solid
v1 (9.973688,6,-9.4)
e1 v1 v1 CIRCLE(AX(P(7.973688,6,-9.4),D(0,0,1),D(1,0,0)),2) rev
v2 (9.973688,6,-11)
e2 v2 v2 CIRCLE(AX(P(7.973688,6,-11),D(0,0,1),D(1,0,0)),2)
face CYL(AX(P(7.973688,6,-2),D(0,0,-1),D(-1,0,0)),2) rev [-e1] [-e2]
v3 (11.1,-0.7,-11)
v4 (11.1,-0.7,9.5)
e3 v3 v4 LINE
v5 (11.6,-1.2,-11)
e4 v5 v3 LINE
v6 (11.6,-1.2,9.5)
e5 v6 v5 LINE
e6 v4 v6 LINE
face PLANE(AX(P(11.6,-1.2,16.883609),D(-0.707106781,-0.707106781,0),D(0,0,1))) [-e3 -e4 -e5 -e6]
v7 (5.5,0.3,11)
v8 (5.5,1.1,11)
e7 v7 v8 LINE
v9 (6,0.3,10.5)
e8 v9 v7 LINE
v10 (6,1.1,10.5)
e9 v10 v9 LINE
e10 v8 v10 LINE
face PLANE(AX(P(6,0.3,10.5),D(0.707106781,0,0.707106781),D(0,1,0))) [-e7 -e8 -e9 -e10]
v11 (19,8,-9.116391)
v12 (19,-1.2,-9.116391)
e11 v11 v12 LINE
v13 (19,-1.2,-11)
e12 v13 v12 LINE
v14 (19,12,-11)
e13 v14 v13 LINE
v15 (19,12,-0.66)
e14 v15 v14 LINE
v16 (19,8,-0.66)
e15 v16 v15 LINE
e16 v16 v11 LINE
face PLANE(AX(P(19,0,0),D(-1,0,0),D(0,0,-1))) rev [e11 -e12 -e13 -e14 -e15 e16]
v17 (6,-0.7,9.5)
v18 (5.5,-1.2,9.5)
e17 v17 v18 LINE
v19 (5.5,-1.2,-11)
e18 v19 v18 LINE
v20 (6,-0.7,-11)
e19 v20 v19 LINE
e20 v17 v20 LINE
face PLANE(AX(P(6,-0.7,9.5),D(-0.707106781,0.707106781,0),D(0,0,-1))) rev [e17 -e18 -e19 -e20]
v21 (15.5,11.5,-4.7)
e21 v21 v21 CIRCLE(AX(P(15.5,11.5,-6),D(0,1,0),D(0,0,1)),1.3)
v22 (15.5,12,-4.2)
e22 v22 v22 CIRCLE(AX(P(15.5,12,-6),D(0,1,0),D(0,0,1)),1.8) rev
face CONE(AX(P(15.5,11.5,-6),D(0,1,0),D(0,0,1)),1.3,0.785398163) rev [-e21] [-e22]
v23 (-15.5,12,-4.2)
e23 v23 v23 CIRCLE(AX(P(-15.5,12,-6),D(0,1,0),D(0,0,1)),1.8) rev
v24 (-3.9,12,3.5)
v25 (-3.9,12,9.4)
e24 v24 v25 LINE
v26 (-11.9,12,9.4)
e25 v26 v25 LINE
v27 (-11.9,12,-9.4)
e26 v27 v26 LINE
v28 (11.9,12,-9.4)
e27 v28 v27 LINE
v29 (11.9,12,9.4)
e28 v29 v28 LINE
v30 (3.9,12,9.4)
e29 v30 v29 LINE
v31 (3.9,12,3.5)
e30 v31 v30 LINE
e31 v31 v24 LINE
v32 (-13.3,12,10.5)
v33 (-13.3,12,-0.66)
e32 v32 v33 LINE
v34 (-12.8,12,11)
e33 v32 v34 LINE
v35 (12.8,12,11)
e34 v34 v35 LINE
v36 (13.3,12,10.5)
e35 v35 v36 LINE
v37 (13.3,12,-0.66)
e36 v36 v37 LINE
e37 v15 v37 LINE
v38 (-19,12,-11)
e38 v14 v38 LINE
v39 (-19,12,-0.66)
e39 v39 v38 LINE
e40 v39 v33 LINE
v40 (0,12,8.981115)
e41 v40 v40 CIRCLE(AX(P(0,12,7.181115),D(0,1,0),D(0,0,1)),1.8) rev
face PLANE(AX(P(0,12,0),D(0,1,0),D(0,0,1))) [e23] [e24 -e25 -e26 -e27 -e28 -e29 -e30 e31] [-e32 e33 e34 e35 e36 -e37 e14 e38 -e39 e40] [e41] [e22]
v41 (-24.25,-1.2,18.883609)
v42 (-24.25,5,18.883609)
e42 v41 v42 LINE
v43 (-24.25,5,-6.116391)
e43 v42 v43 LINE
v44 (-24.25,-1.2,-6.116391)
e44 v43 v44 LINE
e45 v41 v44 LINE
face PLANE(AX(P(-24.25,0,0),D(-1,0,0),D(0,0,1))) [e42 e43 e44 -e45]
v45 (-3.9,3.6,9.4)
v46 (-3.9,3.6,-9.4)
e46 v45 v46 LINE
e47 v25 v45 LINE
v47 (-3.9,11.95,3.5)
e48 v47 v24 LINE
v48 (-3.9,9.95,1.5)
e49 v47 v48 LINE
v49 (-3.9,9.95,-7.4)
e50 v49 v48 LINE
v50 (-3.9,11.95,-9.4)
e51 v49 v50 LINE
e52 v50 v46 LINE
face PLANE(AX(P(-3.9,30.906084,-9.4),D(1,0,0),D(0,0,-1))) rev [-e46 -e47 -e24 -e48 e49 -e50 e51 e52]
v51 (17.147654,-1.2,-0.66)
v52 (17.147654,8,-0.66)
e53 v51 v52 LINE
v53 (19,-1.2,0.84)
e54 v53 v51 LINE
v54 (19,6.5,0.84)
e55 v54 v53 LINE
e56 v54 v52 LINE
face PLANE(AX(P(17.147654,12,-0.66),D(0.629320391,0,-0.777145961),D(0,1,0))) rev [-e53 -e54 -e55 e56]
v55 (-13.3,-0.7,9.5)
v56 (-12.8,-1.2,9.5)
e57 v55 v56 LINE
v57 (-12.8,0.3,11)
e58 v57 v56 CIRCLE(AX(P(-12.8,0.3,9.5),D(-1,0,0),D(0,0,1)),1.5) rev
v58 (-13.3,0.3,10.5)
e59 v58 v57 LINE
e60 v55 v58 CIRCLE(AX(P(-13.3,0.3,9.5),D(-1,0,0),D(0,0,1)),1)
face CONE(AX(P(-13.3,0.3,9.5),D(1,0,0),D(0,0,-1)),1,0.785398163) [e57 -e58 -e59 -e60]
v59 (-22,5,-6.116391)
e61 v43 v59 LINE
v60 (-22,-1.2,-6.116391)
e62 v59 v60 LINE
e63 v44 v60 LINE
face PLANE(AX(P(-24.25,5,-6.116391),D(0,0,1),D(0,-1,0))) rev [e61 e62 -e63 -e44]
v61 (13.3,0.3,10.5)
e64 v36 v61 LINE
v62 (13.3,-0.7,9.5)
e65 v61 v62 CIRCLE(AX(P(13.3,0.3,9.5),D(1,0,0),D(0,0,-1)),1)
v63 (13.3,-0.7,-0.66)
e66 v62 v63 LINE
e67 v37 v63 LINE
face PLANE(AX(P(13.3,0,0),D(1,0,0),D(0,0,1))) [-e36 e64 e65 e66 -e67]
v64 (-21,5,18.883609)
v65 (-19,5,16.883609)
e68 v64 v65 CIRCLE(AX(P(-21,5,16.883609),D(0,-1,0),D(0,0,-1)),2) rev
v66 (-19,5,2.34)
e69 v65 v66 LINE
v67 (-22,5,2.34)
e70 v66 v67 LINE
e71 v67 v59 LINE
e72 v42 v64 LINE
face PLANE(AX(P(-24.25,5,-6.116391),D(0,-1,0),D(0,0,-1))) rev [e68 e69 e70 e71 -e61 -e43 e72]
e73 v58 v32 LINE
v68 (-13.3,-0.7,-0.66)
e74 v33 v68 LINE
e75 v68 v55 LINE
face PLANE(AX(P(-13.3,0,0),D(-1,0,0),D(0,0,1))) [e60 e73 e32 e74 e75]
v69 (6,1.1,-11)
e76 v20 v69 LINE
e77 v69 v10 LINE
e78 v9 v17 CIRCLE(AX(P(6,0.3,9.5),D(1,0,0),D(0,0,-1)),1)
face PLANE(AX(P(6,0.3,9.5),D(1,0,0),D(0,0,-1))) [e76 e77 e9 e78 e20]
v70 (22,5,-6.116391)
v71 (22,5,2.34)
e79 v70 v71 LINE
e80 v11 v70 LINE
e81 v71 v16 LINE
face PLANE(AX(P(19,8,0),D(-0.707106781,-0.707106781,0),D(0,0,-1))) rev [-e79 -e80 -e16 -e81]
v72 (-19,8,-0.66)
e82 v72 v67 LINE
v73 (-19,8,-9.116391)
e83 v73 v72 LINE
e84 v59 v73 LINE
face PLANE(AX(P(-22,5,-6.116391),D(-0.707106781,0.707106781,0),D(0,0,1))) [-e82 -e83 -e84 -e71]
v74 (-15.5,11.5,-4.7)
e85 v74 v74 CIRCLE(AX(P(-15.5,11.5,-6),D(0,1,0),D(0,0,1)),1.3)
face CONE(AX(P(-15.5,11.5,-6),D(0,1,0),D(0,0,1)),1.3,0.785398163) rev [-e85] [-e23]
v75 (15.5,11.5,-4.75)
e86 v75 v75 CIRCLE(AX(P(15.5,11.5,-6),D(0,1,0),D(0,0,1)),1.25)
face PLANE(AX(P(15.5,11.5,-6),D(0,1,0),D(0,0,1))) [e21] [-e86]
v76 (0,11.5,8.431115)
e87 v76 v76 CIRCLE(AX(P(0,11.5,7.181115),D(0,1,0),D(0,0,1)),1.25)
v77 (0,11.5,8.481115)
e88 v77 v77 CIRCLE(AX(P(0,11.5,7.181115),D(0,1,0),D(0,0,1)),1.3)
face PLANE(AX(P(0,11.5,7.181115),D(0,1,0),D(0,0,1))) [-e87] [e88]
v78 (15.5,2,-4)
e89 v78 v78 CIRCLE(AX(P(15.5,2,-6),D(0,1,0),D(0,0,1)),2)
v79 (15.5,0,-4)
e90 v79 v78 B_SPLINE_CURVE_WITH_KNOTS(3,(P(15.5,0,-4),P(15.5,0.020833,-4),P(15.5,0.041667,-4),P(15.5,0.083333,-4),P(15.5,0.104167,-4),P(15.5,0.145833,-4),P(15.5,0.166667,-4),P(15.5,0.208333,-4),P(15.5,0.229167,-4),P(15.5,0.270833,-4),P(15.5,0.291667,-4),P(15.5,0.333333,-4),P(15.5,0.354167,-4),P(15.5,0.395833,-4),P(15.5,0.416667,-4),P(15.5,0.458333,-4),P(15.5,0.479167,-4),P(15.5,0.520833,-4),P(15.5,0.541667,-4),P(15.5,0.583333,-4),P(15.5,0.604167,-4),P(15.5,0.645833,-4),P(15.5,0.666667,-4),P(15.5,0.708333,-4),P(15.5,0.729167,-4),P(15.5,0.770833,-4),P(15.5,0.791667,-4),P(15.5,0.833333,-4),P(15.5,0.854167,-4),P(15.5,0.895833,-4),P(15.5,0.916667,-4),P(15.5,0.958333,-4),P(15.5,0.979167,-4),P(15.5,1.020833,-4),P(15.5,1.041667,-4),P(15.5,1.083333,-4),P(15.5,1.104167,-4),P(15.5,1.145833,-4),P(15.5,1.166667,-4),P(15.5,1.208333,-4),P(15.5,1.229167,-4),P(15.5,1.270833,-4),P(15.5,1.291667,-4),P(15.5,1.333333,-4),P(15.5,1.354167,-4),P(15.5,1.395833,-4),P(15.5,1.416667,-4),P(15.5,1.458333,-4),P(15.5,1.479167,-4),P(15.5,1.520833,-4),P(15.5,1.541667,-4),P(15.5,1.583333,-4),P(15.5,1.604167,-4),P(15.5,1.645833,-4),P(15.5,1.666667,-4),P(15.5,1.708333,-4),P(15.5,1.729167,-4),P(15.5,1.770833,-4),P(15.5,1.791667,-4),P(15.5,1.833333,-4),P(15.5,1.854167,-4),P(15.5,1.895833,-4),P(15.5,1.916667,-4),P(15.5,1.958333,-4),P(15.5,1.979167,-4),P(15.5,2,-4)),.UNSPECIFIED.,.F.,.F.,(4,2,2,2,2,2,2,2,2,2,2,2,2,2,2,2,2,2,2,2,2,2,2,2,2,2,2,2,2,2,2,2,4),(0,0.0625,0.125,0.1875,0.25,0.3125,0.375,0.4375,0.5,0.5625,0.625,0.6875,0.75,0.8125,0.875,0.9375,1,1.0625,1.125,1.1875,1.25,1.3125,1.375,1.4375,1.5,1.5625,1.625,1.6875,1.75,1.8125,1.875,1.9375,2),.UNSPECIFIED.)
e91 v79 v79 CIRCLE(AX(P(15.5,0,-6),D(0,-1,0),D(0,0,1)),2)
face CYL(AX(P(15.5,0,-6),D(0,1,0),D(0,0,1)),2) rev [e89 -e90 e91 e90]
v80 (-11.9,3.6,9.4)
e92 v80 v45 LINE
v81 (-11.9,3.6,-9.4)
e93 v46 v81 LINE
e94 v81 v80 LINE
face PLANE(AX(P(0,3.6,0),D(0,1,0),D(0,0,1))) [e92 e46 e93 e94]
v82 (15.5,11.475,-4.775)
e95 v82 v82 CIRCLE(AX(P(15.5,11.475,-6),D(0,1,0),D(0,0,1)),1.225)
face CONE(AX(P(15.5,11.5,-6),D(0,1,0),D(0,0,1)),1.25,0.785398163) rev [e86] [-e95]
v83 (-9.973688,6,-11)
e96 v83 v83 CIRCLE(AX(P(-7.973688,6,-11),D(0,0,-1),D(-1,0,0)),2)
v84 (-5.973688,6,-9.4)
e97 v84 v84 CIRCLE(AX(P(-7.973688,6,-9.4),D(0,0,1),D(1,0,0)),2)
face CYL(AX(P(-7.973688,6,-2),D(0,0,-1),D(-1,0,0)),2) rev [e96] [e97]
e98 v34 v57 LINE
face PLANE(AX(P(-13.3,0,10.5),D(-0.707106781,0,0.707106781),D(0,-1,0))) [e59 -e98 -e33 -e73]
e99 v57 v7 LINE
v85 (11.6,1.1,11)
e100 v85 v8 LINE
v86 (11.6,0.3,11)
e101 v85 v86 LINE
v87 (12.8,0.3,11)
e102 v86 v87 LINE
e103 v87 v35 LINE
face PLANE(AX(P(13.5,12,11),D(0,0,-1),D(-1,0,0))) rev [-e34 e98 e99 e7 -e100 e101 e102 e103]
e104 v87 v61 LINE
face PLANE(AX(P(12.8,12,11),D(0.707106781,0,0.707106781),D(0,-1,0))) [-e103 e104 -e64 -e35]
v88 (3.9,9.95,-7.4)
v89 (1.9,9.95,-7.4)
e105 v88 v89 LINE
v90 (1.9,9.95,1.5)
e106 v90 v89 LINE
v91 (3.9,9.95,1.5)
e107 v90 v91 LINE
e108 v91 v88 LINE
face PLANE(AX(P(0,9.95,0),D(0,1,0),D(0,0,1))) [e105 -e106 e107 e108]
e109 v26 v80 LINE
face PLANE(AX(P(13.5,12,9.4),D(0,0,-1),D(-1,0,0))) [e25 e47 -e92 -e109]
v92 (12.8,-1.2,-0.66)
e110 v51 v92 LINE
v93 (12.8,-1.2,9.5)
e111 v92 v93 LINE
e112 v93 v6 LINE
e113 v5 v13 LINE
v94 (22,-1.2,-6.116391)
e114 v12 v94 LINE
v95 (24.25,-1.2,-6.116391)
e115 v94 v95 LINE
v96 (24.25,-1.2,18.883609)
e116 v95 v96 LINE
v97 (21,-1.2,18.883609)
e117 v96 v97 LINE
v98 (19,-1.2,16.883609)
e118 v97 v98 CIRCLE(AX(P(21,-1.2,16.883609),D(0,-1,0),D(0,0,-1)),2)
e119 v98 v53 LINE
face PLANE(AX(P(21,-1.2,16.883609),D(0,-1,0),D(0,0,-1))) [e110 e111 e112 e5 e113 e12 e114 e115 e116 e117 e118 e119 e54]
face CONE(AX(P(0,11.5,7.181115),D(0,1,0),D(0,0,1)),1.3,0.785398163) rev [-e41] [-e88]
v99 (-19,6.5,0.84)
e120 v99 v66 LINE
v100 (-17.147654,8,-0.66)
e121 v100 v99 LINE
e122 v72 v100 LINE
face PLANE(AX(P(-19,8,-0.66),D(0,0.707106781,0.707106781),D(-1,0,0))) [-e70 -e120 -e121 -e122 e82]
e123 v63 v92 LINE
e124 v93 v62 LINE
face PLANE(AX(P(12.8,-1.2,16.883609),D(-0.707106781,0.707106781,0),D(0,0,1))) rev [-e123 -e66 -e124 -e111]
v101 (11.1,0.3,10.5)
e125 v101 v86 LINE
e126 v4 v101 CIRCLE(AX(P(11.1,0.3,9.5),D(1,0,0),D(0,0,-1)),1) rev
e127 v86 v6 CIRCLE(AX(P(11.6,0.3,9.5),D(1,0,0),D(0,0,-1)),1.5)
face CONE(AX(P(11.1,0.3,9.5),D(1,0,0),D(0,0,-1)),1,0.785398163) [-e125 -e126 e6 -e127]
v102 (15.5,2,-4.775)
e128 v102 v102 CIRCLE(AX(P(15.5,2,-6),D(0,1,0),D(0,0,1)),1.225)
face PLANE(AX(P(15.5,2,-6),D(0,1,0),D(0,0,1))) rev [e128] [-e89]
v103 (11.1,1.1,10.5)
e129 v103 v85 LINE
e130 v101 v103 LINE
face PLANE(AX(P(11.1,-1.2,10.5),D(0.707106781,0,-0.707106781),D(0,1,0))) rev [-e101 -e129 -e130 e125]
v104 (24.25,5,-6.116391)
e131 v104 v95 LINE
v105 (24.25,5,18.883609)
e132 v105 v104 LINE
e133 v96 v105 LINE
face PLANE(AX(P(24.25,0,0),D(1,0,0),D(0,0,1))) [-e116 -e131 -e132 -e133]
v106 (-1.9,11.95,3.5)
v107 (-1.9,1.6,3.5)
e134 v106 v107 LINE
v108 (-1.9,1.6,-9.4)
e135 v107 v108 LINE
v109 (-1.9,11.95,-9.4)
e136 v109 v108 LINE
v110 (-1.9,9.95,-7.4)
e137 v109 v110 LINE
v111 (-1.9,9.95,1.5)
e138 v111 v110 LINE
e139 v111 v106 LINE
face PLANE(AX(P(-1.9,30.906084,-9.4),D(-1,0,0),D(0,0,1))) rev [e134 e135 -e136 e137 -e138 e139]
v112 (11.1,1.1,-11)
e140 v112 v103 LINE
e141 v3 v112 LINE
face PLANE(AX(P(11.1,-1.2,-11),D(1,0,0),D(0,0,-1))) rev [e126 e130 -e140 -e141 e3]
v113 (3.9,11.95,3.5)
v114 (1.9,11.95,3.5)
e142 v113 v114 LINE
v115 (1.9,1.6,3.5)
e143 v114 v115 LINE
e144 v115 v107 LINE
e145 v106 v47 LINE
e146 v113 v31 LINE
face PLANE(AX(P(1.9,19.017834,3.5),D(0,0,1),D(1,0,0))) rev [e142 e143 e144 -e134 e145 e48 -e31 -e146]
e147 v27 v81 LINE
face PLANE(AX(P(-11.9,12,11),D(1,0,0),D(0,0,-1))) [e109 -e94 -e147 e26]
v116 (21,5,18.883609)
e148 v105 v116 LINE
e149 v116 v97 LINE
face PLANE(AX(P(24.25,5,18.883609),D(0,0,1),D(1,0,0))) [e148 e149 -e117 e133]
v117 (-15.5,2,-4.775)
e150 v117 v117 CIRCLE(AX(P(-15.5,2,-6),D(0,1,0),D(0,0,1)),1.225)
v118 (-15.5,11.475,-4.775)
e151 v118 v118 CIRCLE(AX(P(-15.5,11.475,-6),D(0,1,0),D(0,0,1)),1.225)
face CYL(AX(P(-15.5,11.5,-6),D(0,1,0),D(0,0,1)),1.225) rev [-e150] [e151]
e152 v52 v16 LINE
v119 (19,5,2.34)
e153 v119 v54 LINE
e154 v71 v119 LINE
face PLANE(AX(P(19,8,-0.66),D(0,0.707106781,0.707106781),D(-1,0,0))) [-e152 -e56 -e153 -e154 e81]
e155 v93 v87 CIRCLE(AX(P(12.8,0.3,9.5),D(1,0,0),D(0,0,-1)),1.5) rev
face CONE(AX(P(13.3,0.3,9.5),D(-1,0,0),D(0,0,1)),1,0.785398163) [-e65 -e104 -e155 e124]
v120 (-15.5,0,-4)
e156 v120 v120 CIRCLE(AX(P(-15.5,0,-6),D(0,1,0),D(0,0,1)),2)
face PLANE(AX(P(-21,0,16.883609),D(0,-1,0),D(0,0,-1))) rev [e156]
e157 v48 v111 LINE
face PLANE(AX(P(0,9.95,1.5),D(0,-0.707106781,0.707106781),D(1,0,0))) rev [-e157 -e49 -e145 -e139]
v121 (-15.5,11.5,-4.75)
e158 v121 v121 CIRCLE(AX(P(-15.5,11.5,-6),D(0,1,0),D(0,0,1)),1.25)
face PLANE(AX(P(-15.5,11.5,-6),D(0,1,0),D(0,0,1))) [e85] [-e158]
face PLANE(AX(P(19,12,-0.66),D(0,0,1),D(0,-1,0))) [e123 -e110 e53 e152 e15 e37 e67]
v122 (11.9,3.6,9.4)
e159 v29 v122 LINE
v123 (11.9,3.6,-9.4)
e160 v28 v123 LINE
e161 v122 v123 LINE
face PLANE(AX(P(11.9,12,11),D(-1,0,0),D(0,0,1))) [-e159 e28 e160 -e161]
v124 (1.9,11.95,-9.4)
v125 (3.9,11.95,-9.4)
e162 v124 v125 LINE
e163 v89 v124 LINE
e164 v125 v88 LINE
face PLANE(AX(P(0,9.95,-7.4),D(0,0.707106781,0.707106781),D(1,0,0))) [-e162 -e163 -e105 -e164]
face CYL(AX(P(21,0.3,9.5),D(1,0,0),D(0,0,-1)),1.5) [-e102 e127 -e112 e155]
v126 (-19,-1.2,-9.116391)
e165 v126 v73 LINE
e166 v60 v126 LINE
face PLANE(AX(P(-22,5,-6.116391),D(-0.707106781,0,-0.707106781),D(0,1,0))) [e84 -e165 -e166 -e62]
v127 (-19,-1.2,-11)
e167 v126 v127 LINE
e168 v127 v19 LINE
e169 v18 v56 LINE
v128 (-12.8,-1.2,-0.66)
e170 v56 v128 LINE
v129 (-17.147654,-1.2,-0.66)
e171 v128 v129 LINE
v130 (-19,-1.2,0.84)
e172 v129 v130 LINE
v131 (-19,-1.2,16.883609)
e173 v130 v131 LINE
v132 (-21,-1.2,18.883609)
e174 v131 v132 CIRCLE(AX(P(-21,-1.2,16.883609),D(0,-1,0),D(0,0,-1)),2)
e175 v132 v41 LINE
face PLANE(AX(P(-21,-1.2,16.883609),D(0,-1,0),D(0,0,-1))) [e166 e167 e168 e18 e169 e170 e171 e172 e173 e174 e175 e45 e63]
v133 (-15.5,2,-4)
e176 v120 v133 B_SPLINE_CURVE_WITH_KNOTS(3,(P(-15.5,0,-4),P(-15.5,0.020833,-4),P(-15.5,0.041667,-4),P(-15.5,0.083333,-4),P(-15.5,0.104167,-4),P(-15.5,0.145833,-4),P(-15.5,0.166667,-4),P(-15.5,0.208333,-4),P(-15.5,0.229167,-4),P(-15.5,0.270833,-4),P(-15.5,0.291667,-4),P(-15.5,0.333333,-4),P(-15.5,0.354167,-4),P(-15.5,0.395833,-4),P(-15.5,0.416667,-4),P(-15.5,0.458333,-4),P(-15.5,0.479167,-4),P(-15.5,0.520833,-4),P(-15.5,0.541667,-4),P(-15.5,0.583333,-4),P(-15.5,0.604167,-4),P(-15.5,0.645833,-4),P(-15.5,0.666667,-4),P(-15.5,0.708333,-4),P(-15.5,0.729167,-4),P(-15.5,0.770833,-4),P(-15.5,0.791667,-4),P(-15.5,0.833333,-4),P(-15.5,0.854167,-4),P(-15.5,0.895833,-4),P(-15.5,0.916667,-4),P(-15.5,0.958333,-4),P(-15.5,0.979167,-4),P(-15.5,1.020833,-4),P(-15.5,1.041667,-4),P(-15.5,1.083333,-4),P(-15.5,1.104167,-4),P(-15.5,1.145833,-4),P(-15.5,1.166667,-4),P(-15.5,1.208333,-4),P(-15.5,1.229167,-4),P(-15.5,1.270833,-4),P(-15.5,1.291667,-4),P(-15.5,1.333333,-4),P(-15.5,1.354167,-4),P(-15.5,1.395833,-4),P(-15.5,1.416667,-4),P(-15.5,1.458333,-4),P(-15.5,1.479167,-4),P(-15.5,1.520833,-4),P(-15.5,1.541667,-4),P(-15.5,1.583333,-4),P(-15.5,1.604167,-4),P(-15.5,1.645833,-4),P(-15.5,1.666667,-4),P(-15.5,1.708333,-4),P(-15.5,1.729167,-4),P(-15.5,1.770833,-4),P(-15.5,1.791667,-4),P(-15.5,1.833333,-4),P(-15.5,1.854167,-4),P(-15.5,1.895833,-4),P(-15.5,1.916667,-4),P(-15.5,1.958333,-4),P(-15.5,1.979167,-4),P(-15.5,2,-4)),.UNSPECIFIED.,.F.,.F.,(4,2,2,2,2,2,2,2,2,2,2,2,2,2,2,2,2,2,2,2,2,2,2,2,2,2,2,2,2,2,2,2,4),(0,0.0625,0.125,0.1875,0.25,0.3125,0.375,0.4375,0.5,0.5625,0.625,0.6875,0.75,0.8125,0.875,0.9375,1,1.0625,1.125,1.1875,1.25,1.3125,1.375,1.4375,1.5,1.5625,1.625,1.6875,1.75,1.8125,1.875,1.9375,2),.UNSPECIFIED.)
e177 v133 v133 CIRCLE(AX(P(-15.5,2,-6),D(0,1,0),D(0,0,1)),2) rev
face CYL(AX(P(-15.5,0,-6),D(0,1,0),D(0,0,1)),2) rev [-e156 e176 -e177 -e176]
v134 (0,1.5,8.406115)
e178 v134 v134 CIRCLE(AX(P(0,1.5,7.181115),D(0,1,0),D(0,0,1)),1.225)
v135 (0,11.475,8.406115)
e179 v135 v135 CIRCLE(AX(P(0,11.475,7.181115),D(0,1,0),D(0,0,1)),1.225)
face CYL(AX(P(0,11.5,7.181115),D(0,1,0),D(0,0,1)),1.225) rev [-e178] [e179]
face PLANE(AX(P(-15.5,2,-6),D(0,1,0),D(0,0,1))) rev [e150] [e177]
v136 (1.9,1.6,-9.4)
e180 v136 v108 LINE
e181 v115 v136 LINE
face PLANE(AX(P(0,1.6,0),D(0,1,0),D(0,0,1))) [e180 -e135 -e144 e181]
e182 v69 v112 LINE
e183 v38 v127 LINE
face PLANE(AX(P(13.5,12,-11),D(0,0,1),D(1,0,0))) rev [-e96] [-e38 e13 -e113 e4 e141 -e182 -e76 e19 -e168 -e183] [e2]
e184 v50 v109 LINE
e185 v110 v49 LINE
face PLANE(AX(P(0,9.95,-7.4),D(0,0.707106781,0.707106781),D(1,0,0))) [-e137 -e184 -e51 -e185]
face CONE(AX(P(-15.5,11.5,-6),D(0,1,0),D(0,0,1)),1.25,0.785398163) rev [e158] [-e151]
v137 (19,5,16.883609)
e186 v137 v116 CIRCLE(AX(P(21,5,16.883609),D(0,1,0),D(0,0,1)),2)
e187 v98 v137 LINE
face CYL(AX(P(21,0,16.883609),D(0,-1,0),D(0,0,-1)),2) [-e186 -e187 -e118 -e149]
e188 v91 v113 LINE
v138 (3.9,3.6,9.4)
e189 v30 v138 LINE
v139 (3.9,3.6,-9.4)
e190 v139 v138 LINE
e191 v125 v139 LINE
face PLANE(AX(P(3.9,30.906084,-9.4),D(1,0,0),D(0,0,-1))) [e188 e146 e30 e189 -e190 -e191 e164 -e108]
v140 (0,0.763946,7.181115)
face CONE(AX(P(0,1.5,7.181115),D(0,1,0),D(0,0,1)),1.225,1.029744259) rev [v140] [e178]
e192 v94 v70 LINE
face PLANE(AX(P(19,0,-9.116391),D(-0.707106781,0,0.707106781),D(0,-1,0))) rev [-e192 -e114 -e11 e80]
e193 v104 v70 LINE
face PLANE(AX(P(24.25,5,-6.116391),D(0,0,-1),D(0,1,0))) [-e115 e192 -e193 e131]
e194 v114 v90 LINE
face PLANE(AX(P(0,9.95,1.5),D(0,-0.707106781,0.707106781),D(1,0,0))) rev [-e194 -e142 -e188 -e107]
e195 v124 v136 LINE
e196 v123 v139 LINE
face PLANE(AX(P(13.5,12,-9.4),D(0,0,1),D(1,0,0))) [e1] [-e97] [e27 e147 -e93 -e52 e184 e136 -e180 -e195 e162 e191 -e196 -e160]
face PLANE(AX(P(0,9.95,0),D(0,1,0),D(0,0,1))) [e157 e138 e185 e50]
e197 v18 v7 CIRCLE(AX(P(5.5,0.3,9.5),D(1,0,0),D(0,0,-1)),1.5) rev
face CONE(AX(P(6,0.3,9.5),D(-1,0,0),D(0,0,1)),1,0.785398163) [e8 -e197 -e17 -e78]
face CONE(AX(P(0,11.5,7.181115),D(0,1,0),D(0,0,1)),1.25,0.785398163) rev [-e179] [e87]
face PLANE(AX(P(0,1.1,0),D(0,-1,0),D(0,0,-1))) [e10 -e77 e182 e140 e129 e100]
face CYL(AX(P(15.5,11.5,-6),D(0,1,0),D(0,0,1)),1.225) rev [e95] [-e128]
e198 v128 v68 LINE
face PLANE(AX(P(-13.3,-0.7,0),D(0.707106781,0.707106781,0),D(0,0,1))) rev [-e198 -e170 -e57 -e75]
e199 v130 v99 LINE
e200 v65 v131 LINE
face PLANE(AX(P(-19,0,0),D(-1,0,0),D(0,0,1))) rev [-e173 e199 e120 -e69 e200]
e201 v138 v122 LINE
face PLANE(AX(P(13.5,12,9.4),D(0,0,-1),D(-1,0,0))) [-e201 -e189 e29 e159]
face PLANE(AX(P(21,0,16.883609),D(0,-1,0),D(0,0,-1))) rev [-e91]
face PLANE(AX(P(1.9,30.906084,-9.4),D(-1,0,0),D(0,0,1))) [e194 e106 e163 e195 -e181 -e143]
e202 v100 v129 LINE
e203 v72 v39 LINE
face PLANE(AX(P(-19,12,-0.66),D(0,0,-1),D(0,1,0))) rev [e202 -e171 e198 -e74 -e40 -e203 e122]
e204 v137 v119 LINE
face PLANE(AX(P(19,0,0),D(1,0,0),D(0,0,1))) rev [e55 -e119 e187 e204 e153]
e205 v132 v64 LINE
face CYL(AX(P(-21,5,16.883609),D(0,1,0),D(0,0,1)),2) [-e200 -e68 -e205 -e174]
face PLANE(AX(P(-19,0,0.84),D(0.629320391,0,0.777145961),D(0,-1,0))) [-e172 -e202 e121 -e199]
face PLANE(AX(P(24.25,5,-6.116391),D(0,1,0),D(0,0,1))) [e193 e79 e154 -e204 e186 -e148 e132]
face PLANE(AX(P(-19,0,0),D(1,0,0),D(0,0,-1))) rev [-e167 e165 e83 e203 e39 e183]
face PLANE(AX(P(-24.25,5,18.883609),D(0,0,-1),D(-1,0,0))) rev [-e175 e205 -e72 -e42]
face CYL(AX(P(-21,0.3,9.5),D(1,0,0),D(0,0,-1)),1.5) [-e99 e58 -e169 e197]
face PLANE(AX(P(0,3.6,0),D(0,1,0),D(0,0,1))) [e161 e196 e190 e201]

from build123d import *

# Parameters (mm, degrees)
SKETCH1_W                              = 27
SKETCH1_H                              = 22
BOSS_EXTRUDE1_DEPTH                    = 12
SHELL1_T                               = -1.6
SKETCH2_W                              = 2
SKETCH2_H                              = 18.8
BOSS_EXTRUDE2_DEPTH                    = 10.4
SKETCH4_R                              = 2
CUT_EXTRUDE2_DEPTH                     = 9
SKETCH6_W                              = 10.34
SKETCH6_H                              = 12
BOSS_EXTRUDE4_DEPTH                    = 5.5
SKETCH7_W                              = 25
SKETCH7_H                              = 5
BOSS_EXTRUDE5_DEPTH                    = 5.25
CHAMFER1_SIZE                          = 3
SKETCH8_R                              = 2
CUT_EXTRUDE3_DEPTH                     = 33.994744773
CHAMFER2_SIZE                          = 1.5
CHAMFER2_SIZE2                         = 1.852345735
FILLET1_R                              = 2
CHAMFER1_OF_MIRROR1_SIZE               = 3
CHAMFER2_OF_MIRROR1_SIZE2              = 1.5
CHAMFER2_OF_MIRROR1_SIZE               = 1.852345735
FILLET1_OF_MIRROR1_R                   = 2
BOSS_EXTRUDE7_START                    = 1.2
BOSS_EXTRUDE7_DEPTH                    = 1.2
SKETCH13_W                             = 4.5
SKETCH13_H                             = 22
CUT_EXTRUDE5_DEPTH                     = 1
SKETCH17_W                             = 11.66
SKETCH17_H                             = 13.2
CUT_TOLERANCE_FIX_DEPTH                = 0.2
FILLET2_R                              = 1.5
SKETCH18_W                             = 3.8
SKETCH18_H                             = 5.9
BOSS_EXTRUDE8_DEPTH                    = 10.4
SKETCH11_R                             = 2
CUT_EXTRUDE6_DEPTH                     = 10
SKETCH19_W                             = 8
SKETCH19_H                             = 18.8
BOSS_EXTRUDE9_DEPTH                    = 2
SKETCH20_W                             = 4.5
SKETCH20_H                             = 22
CUT_EXTRUDE7_DEPTH                     = 0.1
SKETCH21_W                             = 7.8
SKETCH21_H                             = 12.9
CUT_EXTRUDE8_DEPTH                     = 2.05
CHAMFER4_SIZE                          = 2
CHAMFER5_SIZE                          = 3
TOLERANCE_ADJ_DEPTH                    = 0.6
CHAMFER6_SIZE                          = 0.5
BOSS_EXTRUDE10_START                   = 9.5
SKETCH23_R                             = 2
BOSS_EXTRUDE10_DEPTH                   = 9.5
F_2_45_2_45_DIAMETER_HOLE1_D           = 2.45
F_2_45_2_45_DIAMETER_HOLE1_DEPTH       = 10
F_2_45_2_45_DIAMETER_HOLE1_CSINK_D     = 2.5
F_2_45_2_45_DIAMETER_HOLE1_CSINK_ANGLE = 90
F_2_45_2_45_DIAMETER_HOLE1_TIP         = 0.736054258
CHAMFER7_SIZE                          = 0.7


with BuildPart() as part:
    # Sketch1 → Boss-Extrude1 (new body)
    with BuildSketch(Plane(origin=(0, 0, 0), x_dir=(1, 0, 0), z_dir=(0, 1, 0))):
        Rectangle(SKETCH1_W, SKETCH1_H)
    extrude(amount=BOSS_EXTRUDE1_DEPTH)

    # Shell1
    shell1_openings = [part.faces().sort_by_distance(p)[0] for p in [
        (0, 12, 0),
    ]]
    offset(amount=SHELL1_T, openings=shell1_openings, kind=Kind.INTERSECTION)

    # Sketch2 → Boss-Extrude2 (add)
    with BuildSketch(Plane(origin=(0, 1.6, 0), x_dir=(1, 0, 0), z_dir=(0, 1, 0))):
        with Locations((-2.9, 0)):
            Rectangle(SKETCH2_W, SKETCH2_H)
    boss_extrude2 = extrude(amount=BOSS_EXTRUDE2_DEPTH)

    # Sketch4 → Cut-Extrude2 (cut)
    with BuildSketch(Plane(origin=(0, 0, -11), x_dir=(-1, 0, 0), z_dir=(0, 0, -1))):
        with Locations((7.973688368, 6)):
            Circle(SKETCH4_R)
    cut_extrude2 = extrude(amount=-CUT_EXTRUDE2_DEPTH, mode=Mode.SUBTRACT)

    # Sketch6 → Boss-Extrude4 (add)
    with BuildSketch(Plane.ZY.offset(13.5)):
        with Locations((-5.83, 6)):
            Rectangle(SKETCH6_W, SKETCH6_H)
    boss_extrude4 = extrude(amount=BOSS_EXTRUDE4_DEPTH)

    # Sketch7 → Boss-Extrude5 (add)
    with BuildSketch(Plane.ZY.offset(19)):
        with Locations((6.383608836, 2.5)):
            Rectangle(SKETCH7_W, SKETCH7_H)
    boss_extrude5 = extrude(amount=BOSS_EXTRUDE5_DEPTH)

    # Chamfer1
    chamfer1_edges = [part.edges().sort_by_distance(p)[0] for p in [
        (-19, 2.5, -6.116391164),
    ]]
    chamfer(chamfer1_edges, length=CHAMFER1_SIZE)

    # Sketch8 → Cut-Extrude3 (cut, through all)
    with BuildSketch(Plane(origin=(0, 12, 0), x_dir=(1, 0, 0), z_dir=(0, 1, 0))):
        with Locations(Location((-15.5, 6, 0), (0, 0, 270))):
            Circle(SKETCH8_R)
    cut_extrude3 = extrude(amount=-CUT_EXTRUDE3_DEPTH, mode=Mode.SUBTRACT)

    # Chamfer2
    chamfer2_edges = [part.edges().sort_by_distance(p)[0] for p in [
        (-19, 2.5, -0.66),
    ]]
    chamfer2_side = [part.faces().sort_by_distance(p)[0] for p in [
        (-19, 2.5, 9.111804418),
    ]]
    chamfer(chamfer2_edges, length=CHAMFER2_SIZE, length2=CHAMFER2_SIZE2, reference=chamfer2_side[0])

    # Fillet1
    fillet1_edges = [part.edges().sort_by_distance(p)[0] for p in [
        (-19, 2.5, 18.883608836),
    ]]
    fillet(fillet1_edges, radius=FILLET1_R)

    # Mirror1: Boss-Extrude2, Cut-Extrude2, Boss-Extrude4, Boss-Extrude5, Cut-Extrude3 across plane
    add(boss_extrude2.mirror(Plane.ZY))
    add(cut_extrude2.mirror(Plane.ZY), mode=Mode.SUBTRACT)
    add(boss_extrude4.mirror(Plane.ZY))
    add(boss_extrude5.mirror(Plane.ZY))
    add(cut_extrude3.mirror(Plane.ZY), mode=Mode.SUBTRACT)

    # Chamfer1 of Mirror1
    chamfer1_of_mirror1_edges = [part.edges().sort_by_distance(p)[0] for p in [
        (19, 2.5, -6.116391164),
    ]]
    chamfer(chamfer1_of_mirror1_edges, length=CHAMFER1_OF_MIRROR1_SIZE)

    # Chamfer2 of Mirror1
    chamfer2_of_mirror1_edges = [part.edges().sort_by_distance(p)[0] for p in [
        (19, 2.5, -0.66),
    ]]
    chamfer(chamfer2_of_mirror1_edges, length=CHAMFER2_OF_MIRROR1_SIZE, length2=CHAMFER2_OF_MIRROR1_SIZE2)

    # Fillet1 of Mirror1
    fillet1_of_mirror1_edges = [part.edges().sort_by_distance(p)[0] for p in [
        (19, 2.5, 18.883608836),
    ]]
    fillet(fillet1_of_mirror1_edges, radius=FILLET1_OF_MIRROR1_R)

    # Sketch12 → Boss-Extrude7 (add)
    with BuildSketch(Plane.XZ.offset(BOSS_EXTRUDE7_START)):
        with BuildLine():
            Line((6.6, 11), (-13.5, 11))
            Line((-13.5, 11), (-13.5, -0.66))
            Line((-13.5, -0.66), (-17.147654265, -0.66))
            Line((-17.147654265, -0.66), (-19, 0.84))
            Line((-19, 0.84), (-19, 16.883608836))
            ThreePointArc((-19, 16.883608836), (-19.585786438, 18.297822398), (-21, 18.883608836))
            Line((-21, 18.883608836), (-24.25, 18.883608836))
            Line((-24.25, 18.883608836), (-24.25, -6.116391164))
            Line((-24.25, -6.116391164), (-22, -6.116391164))
            Line((-22, -6.116391164), (-19, -9.116391164))
            Line((-19, -9.116391164), (-19, -11))
            Line((-19, -11), (6.6, -11))
            Line((6.6, -11), (6.6, 11))
        make_face()
        with BuildLine():
            Line((11.1, -11), (11.1, 11))
            Line((11.1, 11), (13.5, 11))
            Line((13.5, 11), (13.5, -0.66))
            Line((13.5, -0.66), (17.147654265, -0.66))
            Line((17.147654265, -0.66), (19, 0.84))
            Line((19, 0.84), (19, 16.883608836))
            ThreePointArc((19, 16.883608836), (19.585786438, 18.297822398), (21, 18.883608836))
            Line((21, 18.883608836), (24.25, 18.883608836))
            Line((24.25, 18.883608836), (24.25, -6.116391164))
            Line((24.25, -6.116391164), (22, -6.116391164))
            Line((22, -6.116391164), (19, -9.116391164))
            Line((19, -9.116391164), (19, -11))
            Line((19, -11), (11.1, -11))
        make_face()
    extrude(amount=-BOSS_EXTRUDE7_DEPTH)

    # Sketch13 → Cut-Extrude5 (cut)
    with BuildSketch(Plane(origin=(0, 0, 0), x_dir=(-1, 0, 0), z_dir=(0, -1, 0))):
        with Locations((-8.85, 0)):
            Rectangle(SKETCH13_W, SKETCH13_H)
    extrude(amount=-CUT_EXTRUDE5_DEPTH, mode=Mode.SUBTRACT)

    # Sketch17 → Cut- tolerance fix (cut)
    with BuildSketch(Plane.ZY.offset(13.5)):
        with Locations((5.17, 5.4)):
            Rectangle(SKETCH17_W, SKETCH17_H)
    cut_tolerance_fix = extrude(amount=-CUT_TOLERANCE_FIX_DEPTH, mode=Mode.SUBTRACT)

    # Mirror2: Cut- tolerance fix across plane
    add(cut_tolerance_fix.mirror(Plane.ZY), mode=Mode.SUBTRACT)

    # Fillet2
    fillet2_edges = [part.edges().sort_by_distance(p)[0] for p in [
        (-3.35, -1.2, 11),
        (12.2, -1.2, 11),
    ]]
    fillet(fillet2_edges, radius=FILLET2_R)

    # Sketch18 → Boss-Extrude8 (add)
    with BuildSketch(Plane(origin=(0, 1.6, 0), x_dir=(1, 0, 0), z_dir=(0, 1, 0))):
        with Locations((0, -6.45)):
            Rectangle(SKETCH18_W, SKETCH18_H)
    extrude(amount=BOSS_EXTRUDE8_DEPTH)

    # Sketch11 → Cut-Extrude6 (cut)
    with BuildSketch(Plane(origin=(0, 12, 0), x_dir=(1, 0, 0), z_dir=(0, 1, 0))):
        with Locations(Location((0, -7.181115317, 0), (0, 0, 270))):
            Circle(SKETCH11_R)
    extrude(amount=-CUT_EXTRUDE6_DEPTH, mode=Mode.SUBTRACT)

    # Sketch19 → Boss-Extrude9 (add)
    with BuildSketch(Plane(origin=(0, 1.6, 0), x_dir=(1, 0, 0), z_dir=(0, 1, 0))):
        with Locations((7.9, 0)):
            Rectangle(SKETCH19_W, SKETCH19_H)
        with Locations((-7.9, 0)):
            Rectangle(SKETCH19_W, SKETCH19_H)
    extrude(amount=BOSS_EXTRUDE9_DEPTH)

    # Sketch20 → Cut-Extrude7 (cut)
    with BuildSketch(Plane.XZ.offset(-1)):
        with Locations((8.85, 0)):
            Rectangle(SKETCH20_W, SKETCH20_H)
    extrude(amount=-CUT_EXTRUDE7_DEPTH, mode=Mode.SUBTRACT)

    # Sketch21 → Cut-Extrude8 (cut)
    with BuildSketch(Plane(origin=(0, 12, 0), x_dir=(1, 0, 0), z_dir=(0, 1, 0))):
        with Locations((0, 2.95)):
            Rectangle(SKETCH21_W, SKETCH21_H)
    extrude(amount=-CUT_EXTRUDE8_DEPTH, mode=Mode.SUBTRACT)

    # Chamfer4
    chamfer4_edges = [part.edges().sort_by_distance(p)[0] for p in [
        (-2.9, 9.95, -9.4),
        (-2.9, 9.95, 3.5),
        (2.9, 9.95, -9.4),
        (2.9, 9.95, 3.5),
    ]]
    chamfer(chamfer4_edges, length=CHAMFER4_SIZE)

    # Chamfer5
    chamfer5_edges = [part.edges().sort_by_distance(p)[0] for p in [
        (19, 5, -4.888195582),
        (18.073827133, 5, -0.66),
        (-19, 5, -4.888195582),
        (-18.073827133, 5, -0.66),
    ]]
    chamfer(chamfer5_edges, length=CHAMFER5_SIZE)

    # Sketch22 → tolerance adj (cut)
    with BuildSketch(Plane(origin=(6.6, 0, 0), x_dir=(0, 0, -1), z_dir=(1, 0, 0))):
        with BuildLine():
            Line((-11, 1.1), (-11, 0.3))
            ThreePointArc((-11, 0.3), (-10.560660172, -0.760660172), (-9.5, -1.2))
            Line((-9.5, -1.2), (11, -1.2))
            Line((11, -1.2), (11, 1.1))
            Line((11, 1.1), (-11, 1.1))
        make_face()
    extrude(amount=-TOLERANCE_ADJ_DEPTH, mode=Mode.SUBTRACT)

    # Chamfer6
    chamfer6_edges = [part.edges().sort_by_distance(p)[0] for p in [
        (-13.3, -1.2, 4.42),
        (13.3, -1.2, 4.42),
        (11.1, -1.2, -0.75),
        (11.1, 0.7, 11),
        (11.1, -0.760660172, 10.560660172),
        (13.3, 6.15, 11),
        (-13.3, 6.15, 11),
        (13.3, -0.760660172, 10.560660172),
        (-13.3, -0.760660172, 10.560660172),
        (6, -1.2, -0.75),
        (6, -0.760660172, 10.560660172),
        (6, 0.7, 11),
    ]]
    chamfer(chamfer6_edges, length=CHAMFER6_SIZE)

    # Sketch23 → Boss-Extrude10 (add)
    with BuildSketch(Plane(origin=(0, 2, 0), x_dir=(1, 0, 0), z_dir=(0, 1, 0)).offset(BOSS_EXTRUDE10_START)):
        with Locations(Location((-15.5, 6, 0), (0, 0, 270))):
            Circle(SKETCH23_R)
        with Locations(Location((15.5, 6, 0), (0, 0, 270))):
            Circle(SKETCH23_R)
        with Locations(Location((0, -7.181115317, 0), (0, 0, 270))):
            Circle(SKETCH23_R)
    extrude(amount=-BOSS_EXTRUDE10_DEPTH)

    # Ø2.45 (2.45) Diameter Hole1
    with Locations(Plane(origin=(0, 11.5, 0), x_dir=(1, 0, 0), z_dir=(0, 1, 0))):
        with Locations((0, -7.181115317), (-15.5, 6), (15.5, 6)):
            CounterSinkHole(F_2_45_2_45_DIAMETER_HOLE1_D / 2, F_2_45_2_45_DIAMETER_HOLE1_CSINK_D / 2, depth=F_2_45_2_45_DIAMETER_HOLE1_DEPTH, counter_sink_angle=F_2_45_2_45_DIAMETER_HOLE1_CSINK_ANGLE)
            with Locations((0, 0, -(F_2_45_2_45_DIAMETER_HOLE1_DEPTH + F_2_45_2_45_DIAMETER_HOLE1_TIP / 2))):  # 118° drill point
                Cone(0, F_2_45_2_45_DIAMETER_HOLE1_D / 2, F_2_45_2_45_DIAMETER_HOLE1_TIP, mode=Mode.SUBTRACT)

    # Chamfer7
    # the kernel refuses this chamfer: 0.7 mm, written as the material it adds along each edge
    with BuildSketch(Plane(origin=(15.5, 11.5, -6), x_dir=(0, 0, 1), z_dir=(-1, 0, 0))) as chamfer7_piece_1_section:
        Polygon((2, CHAMFER7_SIZE), (2 - CHAMFER7_SIZE, 0), (2, 0), align=None)
    chamfer7_piece_1 = revolve(axis=Axis((15.5, 11.5, -6), (0, 1, 0)), mode=Mode.PRIVATE)
    chamfer7_piece_1 = split(chamfer7_piece_1, bisect_by=Plane(origin=(15.5, 12, -7.549927673), z_dir=(0, -1, 0)), keep=Keep.TOP, mode=Mode.PRIVATE)
    add(chamfer7_piece_1)
    with BuildSketch(Plane(origin=(0, 11.5, 7.181115317), x_dir=(0, 0, 1), z_dir=(-1, 0, 0))) as chamfer7_piece_2_section:
        Polygon((2, CHAMFER7_SIZE), (2 - CHAMFER7_SIZE, 0), (2, 0), align=None)
    chamfer7_piece_2 = revolve(axis=Axis((0, 11.5, 7.181115317), (0, 1, 0)), mode=Mode.PRIVATE)
    chamfer7_piece_2 = split(chamfer7_piece_2, bisect_by=Plane(origin=(0, 12, 5.631187644), z_dir=(0, -1, 0)), keep=Keep.TOP, mode=Mode.PRIVATE)
    add(chamfer7_piece_2)
    with BuildSketch(Plane(origin=(-15.5, 11.5, -6), x_dir=(0, 0, 1), z_dir=(-1, 0, 0))) as chamfer7_piece_3_section:
        Polygon((2, CHAMFER7_SIZE), (2 - CHAMFER7_SIZE, 0), (2, 0), align=None)
    chamfer7_piece_3 = revolve(axis=Axis((-15.5, 11.5, -6), (0, 1, 0)), mode=Mode.PRIVATE)
    chamfer7_piece_3 = split(chamfer7_piece_3, bisect_by=Plane(origin=(-15.5, 12, -7.549927673), z_dir=(0, -1, 0)), keep=Keep.TOP, mode=Mode.PRIVATE)
    add(chamfer7_piece_3)


solid = part.part
